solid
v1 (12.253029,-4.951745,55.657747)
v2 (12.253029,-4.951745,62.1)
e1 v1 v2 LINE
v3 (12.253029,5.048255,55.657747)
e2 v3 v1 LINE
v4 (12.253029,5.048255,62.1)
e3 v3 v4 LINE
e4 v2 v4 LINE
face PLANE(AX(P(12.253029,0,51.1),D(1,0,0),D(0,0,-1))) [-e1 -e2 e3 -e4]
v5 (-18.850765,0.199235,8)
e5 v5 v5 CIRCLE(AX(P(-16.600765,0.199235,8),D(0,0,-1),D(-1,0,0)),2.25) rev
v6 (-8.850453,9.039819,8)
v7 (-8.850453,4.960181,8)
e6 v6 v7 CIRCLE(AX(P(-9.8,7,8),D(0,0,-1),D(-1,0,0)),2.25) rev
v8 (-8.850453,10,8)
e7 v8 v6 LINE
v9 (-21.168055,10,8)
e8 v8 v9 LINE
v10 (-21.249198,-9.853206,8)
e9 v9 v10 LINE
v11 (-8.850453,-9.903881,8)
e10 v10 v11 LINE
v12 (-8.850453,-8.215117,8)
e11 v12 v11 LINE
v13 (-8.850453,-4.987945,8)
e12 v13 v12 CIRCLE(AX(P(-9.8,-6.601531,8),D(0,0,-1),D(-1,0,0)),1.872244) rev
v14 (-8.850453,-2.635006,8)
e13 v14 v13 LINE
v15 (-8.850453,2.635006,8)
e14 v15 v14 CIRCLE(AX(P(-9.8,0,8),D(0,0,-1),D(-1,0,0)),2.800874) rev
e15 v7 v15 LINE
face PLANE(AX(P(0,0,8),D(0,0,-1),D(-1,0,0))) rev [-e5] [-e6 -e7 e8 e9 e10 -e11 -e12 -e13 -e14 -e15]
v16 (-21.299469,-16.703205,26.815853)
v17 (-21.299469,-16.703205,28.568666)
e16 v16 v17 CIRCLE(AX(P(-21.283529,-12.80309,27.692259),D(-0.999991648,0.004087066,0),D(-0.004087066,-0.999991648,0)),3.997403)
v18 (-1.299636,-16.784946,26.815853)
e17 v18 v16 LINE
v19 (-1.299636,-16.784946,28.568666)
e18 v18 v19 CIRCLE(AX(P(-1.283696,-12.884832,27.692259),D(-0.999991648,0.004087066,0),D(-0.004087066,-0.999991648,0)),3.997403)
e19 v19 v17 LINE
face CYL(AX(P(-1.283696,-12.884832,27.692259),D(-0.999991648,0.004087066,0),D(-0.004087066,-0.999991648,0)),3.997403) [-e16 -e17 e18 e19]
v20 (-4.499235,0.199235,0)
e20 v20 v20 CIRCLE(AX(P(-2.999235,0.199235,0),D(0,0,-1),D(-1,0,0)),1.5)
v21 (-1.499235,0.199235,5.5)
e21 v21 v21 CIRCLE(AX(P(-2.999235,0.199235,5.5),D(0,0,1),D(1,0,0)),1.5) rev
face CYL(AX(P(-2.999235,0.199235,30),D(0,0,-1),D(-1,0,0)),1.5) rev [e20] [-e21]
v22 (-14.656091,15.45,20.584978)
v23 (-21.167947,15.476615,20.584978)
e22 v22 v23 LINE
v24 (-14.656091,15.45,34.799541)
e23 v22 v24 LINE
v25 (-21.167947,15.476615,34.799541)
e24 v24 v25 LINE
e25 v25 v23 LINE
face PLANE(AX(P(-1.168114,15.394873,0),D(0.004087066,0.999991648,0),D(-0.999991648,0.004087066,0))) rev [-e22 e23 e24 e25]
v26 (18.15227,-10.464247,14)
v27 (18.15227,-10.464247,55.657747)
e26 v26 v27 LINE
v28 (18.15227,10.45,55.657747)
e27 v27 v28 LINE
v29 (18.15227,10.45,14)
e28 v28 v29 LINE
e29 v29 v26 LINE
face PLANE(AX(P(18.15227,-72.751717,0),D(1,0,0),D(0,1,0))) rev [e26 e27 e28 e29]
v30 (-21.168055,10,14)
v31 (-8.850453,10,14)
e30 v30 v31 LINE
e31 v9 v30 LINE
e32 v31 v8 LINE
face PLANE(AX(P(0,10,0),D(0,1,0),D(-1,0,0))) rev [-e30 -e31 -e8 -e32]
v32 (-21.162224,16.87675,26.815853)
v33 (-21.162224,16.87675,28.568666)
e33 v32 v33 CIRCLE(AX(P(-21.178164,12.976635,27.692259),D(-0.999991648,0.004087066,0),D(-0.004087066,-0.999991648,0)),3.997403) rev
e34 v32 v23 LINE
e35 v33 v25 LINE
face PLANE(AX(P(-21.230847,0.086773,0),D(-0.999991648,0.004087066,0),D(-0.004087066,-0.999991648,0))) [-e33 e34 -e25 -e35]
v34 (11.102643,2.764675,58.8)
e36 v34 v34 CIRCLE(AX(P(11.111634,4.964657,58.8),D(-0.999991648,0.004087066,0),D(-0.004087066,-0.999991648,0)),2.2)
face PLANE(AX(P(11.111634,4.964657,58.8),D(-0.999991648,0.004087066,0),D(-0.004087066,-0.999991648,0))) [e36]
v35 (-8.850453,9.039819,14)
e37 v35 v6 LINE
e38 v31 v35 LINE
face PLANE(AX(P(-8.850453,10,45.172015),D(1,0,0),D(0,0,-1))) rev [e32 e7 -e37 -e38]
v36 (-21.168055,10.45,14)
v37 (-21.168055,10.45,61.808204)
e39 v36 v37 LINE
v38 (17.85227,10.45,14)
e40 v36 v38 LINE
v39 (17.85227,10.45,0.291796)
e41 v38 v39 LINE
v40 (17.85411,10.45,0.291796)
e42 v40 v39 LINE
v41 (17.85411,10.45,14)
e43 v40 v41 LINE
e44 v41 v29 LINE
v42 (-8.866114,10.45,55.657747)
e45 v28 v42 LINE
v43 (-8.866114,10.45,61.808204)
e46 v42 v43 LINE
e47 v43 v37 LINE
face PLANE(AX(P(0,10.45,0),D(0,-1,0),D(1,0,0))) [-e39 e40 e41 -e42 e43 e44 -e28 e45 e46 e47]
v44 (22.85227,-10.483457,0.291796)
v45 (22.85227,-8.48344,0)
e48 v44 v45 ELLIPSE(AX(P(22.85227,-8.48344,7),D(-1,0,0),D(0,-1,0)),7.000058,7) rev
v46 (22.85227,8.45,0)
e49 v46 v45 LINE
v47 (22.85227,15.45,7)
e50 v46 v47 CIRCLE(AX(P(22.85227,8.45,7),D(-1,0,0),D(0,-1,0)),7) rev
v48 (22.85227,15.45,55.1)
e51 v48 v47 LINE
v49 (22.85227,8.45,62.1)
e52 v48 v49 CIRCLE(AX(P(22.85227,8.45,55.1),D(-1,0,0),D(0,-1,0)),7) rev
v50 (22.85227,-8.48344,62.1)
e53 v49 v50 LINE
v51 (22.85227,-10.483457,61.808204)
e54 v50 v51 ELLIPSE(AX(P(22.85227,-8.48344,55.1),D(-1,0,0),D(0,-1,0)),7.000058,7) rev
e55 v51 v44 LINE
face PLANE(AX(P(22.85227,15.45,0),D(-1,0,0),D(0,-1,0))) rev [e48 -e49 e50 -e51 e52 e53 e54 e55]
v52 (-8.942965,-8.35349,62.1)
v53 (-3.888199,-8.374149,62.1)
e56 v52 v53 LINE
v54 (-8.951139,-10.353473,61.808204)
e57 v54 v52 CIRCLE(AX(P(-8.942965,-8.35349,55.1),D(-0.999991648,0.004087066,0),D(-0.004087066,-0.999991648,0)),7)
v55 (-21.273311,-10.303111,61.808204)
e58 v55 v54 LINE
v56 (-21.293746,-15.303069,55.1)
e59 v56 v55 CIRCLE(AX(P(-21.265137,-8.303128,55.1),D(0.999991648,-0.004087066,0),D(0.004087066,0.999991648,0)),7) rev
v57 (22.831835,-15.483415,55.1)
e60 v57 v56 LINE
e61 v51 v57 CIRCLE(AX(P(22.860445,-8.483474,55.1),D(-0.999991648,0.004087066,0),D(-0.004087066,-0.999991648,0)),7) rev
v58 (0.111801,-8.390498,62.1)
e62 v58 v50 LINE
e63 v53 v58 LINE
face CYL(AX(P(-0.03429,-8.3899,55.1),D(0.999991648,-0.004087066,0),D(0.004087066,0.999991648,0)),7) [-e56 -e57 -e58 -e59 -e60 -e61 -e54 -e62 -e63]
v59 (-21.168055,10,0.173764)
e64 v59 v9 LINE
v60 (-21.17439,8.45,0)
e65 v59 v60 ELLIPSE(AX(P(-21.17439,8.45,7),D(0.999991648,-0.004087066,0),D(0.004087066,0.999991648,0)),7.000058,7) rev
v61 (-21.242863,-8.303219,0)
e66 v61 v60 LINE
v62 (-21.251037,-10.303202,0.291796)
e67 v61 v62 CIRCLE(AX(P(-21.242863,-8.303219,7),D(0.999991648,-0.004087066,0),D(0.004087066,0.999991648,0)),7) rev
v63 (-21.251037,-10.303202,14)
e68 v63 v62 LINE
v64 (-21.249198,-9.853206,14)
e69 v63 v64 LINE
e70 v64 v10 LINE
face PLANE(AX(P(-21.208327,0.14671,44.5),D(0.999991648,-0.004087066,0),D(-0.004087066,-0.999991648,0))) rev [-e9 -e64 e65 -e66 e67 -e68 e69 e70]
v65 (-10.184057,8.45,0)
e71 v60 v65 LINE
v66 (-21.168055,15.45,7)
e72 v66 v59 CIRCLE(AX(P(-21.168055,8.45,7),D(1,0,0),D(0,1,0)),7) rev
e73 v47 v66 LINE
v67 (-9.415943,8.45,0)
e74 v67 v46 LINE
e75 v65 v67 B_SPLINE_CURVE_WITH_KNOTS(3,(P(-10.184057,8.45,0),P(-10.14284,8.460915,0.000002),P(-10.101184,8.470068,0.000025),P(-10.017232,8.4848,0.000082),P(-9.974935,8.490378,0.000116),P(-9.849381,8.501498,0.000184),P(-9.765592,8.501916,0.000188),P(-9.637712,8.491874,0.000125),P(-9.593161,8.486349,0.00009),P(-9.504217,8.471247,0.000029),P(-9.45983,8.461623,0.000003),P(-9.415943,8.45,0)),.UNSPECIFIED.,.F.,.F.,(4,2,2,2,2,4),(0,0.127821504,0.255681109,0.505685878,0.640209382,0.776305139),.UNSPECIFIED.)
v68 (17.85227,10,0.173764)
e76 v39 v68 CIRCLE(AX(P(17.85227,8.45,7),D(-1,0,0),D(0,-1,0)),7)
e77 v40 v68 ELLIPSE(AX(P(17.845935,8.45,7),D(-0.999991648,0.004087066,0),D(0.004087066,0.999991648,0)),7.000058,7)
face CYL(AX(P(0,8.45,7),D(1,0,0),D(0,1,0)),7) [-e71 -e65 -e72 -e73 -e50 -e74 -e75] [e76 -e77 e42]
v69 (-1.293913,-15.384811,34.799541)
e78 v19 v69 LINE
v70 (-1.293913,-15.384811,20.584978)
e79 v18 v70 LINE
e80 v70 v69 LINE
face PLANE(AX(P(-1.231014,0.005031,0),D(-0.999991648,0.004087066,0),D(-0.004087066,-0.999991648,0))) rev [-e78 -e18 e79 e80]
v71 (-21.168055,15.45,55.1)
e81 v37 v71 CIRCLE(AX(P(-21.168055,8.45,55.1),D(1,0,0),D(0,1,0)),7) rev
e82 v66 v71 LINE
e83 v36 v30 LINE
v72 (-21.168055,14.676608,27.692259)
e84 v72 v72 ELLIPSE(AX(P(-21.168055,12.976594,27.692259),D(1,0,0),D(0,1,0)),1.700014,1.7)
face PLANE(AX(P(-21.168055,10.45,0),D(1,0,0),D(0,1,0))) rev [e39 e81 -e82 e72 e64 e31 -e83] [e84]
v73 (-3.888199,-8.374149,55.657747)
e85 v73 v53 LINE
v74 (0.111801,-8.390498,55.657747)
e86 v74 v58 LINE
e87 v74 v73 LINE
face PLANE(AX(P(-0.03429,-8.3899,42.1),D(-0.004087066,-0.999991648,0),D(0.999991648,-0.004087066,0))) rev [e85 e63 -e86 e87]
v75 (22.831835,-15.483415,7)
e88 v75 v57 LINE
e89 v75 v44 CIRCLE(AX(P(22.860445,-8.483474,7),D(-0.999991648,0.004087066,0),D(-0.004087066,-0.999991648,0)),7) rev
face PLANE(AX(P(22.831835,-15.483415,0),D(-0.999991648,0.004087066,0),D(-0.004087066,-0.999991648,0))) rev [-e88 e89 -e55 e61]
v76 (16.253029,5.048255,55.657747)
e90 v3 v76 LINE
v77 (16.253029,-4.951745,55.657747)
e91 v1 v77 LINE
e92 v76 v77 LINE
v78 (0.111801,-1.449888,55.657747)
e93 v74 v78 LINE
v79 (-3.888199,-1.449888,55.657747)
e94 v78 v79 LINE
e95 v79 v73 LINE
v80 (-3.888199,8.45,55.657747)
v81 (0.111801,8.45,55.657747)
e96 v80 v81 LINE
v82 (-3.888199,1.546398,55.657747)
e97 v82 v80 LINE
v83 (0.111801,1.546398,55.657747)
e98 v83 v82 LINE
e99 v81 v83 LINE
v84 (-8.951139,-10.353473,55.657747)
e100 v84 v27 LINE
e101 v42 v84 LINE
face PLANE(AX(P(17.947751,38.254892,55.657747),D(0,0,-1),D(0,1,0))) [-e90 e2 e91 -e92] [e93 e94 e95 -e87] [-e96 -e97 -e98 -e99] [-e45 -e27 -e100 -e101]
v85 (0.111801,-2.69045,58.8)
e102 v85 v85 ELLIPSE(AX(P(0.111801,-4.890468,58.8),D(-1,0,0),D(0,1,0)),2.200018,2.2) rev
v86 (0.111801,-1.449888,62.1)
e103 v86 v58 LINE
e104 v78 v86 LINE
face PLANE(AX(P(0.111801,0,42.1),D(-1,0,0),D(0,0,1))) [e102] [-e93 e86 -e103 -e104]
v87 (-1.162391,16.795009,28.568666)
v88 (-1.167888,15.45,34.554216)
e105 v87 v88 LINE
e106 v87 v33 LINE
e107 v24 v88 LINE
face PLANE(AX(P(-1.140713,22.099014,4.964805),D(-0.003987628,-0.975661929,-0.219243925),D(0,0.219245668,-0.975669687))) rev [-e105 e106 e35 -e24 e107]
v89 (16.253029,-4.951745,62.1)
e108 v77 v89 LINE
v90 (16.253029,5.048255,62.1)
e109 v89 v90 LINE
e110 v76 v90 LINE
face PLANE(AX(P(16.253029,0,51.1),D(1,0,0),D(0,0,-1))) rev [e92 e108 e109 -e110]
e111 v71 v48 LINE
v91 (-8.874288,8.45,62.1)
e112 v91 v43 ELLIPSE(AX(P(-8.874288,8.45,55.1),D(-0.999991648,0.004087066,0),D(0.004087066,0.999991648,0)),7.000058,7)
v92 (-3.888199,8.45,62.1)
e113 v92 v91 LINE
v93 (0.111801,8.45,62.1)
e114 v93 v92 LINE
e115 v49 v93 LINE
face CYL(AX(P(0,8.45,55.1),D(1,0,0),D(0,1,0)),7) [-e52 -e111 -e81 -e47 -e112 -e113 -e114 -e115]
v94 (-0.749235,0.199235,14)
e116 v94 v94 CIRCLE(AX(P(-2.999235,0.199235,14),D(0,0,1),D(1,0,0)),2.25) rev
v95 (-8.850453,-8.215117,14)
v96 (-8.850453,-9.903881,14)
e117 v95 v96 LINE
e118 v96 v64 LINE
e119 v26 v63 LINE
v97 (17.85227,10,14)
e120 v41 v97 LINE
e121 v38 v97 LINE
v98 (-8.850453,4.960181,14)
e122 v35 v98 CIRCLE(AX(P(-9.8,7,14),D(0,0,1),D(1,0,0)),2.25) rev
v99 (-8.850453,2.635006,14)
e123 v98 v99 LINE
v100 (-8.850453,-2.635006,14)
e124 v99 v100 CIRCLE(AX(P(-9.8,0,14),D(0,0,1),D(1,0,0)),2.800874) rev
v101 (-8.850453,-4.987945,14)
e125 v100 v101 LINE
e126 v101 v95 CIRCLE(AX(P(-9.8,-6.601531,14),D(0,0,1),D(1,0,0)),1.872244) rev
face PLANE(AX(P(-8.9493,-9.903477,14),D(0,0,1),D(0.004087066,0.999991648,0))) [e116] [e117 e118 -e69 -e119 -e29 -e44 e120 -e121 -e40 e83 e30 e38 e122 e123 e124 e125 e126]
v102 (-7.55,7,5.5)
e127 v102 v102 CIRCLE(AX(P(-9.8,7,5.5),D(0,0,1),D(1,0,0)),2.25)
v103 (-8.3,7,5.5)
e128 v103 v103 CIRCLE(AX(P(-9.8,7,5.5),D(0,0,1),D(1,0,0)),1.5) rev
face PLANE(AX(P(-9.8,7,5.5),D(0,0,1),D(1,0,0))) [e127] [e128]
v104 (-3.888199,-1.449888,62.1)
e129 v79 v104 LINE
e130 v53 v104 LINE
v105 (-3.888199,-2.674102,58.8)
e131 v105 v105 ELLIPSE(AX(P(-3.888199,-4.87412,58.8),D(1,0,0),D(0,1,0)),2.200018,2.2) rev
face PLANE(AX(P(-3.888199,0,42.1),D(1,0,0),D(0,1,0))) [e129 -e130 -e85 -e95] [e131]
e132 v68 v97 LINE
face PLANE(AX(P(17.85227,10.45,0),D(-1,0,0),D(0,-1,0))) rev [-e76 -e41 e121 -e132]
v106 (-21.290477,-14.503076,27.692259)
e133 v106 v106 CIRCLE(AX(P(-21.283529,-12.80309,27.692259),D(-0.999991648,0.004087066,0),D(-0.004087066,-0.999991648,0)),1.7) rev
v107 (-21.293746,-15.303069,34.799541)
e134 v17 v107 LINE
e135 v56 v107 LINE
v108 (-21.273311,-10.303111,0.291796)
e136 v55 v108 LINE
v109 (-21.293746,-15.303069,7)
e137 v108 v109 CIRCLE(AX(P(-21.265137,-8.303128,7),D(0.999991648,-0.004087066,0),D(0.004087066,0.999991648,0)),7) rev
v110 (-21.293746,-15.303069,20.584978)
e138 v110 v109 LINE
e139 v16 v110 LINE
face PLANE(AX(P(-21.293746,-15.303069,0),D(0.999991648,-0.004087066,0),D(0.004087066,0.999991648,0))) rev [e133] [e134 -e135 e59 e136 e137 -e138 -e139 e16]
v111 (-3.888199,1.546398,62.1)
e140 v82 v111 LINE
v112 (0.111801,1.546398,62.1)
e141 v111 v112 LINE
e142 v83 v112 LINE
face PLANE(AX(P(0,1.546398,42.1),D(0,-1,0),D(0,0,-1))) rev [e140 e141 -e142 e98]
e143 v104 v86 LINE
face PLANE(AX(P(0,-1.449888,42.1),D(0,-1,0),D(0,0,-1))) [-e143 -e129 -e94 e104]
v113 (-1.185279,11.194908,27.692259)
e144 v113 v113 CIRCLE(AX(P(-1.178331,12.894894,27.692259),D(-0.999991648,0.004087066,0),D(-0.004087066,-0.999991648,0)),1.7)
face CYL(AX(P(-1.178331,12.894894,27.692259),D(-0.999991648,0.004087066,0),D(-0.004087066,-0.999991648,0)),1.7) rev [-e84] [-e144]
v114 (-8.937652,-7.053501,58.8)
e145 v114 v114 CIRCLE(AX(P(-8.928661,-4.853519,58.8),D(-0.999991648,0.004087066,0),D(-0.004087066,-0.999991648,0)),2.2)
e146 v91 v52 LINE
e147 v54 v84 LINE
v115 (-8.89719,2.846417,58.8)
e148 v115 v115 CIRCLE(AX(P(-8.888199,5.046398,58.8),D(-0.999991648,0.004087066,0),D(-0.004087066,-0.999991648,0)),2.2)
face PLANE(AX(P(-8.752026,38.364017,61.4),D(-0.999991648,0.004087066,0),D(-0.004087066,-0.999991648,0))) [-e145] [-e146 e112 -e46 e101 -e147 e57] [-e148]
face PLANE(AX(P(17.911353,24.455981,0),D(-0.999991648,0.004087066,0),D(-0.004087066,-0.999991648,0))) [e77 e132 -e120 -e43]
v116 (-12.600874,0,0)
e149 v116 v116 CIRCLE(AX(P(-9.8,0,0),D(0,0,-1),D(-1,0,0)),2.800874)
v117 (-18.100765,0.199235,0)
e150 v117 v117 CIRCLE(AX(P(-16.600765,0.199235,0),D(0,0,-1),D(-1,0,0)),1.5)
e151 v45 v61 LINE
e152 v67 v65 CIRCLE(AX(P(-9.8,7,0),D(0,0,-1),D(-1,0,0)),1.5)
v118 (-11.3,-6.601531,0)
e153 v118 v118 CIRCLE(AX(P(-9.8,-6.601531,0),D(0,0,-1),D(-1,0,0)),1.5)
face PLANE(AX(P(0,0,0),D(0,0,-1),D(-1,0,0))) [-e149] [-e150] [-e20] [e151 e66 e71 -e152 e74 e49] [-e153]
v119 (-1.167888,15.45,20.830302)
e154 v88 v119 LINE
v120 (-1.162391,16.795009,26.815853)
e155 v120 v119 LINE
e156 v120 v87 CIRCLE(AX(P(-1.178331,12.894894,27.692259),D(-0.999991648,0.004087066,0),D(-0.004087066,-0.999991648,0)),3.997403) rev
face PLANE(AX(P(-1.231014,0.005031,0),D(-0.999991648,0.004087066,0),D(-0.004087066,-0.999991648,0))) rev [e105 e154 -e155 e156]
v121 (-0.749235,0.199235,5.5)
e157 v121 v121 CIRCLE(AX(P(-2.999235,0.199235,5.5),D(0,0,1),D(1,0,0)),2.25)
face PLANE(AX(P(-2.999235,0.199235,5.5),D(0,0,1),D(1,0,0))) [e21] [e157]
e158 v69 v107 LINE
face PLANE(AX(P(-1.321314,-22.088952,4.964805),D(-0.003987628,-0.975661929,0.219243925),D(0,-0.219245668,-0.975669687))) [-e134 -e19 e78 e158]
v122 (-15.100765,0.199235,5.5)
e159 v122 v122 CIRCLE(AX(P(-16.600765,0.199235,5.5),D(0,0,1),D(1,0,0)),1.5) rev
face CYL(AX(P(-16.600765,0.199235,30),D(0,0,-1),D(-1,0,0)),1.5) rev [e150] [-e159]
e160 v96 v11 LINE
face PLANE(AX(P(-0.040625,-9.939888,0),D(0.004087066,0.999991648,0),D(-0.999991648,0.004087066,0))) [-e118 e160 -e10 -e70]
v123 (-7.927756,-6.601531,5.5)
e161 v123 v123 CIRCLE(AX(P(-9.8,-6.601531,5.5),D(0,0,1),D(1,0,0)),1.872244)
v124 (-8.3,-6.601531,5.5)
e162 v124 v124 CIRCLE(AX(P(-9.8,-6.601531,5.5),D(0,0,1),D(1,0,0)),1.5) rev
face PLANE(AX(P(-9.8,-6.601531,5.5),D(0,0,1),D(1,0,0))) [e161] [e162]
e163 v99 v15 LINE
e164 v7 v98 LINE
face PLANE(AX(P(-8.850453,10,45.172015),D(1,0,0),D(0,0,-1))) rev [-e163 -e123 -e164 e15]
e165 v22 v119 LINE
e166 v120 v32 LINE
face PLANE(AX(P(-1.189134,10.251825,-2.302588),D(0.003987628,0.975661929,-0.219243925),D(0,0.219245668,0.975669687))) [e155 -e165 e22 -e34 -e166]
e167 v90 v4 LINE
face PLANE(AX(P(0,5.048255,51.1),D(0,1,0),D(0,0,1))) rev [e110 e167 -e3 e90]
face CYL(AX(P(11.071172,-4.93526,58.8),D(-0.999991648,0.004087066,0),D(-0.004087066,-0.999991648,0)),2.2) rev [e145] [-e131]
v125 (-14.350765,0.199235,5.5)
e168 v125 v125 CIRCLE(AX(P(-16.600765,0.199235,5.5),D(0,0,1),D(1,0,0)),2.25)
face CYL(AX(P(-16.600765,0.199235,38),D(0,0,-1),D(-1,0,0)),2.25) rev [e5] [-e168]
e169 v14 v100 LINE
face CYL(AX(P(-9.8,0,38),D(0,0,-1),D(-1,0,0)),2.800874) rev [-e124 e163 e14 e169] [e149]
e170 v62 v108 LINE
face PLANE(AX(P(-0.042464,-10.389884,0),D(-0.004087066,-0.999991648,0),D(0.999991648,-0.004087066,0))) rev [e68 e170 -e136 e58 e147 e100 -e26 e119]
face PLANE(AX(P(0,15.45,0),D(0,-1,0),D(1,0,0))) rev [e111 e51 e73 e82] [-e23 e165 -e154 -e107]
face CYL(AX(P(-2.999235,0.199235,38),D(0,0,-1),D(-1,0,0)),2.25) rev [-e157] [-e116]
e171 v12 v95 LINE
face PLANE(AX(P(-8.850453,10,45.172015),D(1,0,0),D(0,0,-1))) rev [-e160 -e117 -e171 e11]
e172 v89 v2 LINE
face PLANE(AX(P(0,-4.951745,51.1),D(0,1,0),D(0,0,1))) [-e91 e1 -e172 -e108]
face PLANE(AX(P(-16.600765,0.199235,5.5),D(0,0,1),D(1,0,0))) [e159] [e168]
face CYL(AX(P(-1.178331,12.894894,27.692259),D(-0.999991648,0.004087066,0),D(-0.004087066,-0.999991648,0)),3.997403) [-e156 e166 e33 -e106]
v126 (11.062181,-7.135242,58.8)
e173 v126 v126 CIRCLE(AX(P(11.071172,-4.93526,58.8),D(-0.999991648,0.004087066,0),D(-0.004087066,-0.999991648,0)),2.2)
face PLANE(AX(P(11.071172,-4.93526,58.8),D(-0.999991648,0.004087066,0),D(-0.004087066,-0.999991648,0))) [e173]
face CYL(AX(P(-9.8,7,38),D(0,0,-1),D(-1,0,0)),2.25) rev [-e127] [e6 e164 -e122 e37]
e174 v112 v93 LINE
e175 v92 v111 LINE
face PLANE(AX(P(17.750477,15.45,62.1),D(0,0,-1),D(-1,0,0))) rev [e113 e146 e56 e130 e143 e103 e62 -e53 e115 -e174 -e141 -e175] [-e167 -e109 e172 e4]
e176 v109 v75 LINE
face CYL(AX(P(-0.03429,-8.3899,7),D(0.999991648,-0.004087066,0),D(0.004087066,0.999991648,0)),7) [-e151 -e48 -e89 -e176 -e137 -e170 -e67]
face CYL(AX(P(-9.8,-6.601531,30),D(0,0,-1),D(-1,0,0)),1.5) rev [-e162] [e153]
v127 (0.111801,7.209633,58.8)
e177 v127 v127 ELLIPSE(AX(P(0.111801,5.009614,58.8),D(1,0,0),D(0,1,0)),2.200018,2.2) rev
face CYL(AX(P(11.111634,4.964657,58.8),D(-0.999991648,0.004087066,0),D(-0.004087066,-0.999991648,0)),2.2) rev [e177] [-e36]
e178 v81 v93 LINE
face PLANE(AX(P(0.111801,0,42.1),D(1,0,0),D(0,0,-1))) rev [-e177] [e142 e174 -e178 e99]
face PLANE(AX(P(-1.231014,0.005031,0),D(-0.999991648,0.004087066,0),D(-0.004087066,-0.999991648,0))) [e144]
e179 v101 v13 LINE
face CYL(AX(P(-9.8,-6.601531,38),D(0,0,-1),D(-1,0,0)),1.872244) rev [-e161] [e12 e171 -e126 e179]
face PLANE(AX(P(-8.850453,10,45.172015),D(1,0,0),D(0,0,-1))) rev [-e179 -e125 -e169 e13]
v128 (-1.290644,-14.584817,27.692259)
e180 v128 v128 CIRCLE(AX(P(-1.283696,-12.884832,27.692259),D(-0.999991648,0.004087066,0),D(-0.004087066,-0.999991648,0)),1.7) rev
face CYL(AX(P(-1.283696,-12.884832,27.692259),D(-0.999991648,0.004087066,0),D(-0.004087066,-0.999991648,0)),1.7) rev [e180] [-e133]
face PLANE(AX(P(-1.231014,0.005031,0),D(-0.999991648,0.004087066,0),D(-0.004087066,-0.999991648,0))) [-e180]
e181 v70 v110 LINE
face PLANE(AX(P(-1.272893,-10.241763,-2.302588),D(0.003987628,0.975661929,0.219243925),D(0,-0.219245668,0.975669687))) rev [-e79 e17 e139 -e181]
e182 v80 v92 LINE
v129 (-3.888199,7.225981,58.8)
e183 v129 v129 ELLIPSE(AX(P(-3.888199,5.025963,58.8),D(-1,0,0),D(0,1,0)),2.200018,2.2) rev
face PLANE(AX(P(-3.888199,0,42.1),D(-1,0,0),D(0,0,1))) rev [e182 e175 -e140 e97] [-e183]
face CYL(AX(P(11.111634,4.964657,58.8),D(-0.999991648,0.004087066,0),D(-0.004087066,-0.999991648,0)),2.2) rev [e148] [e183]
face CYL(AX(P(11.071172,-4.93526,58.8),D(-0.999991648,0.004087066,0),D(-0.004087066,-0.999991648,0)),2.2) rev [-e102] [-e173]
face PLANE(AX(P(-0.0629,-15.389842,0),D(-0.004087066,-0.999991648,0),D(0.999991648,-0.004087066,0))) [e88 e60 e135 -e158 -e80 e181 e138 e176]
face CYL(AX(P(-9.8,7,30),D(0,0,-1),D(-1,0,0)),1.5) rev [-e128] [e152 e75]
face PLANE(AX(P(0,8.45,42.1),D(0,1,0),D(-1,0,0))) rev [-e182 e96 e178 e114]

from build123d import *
from build123d.topology import SkipClean

# Parameters (mm, degrees)
BOSS_EXTRUDE1_DEPTH     = 8
BOSS_EXTRUDE2_REACH     = 29.616
SKETCH3_W               = 8
SKETCH3_H               = 20
BOSS_EXTRUDE3_DEPTH     = 6
SKETCH5_R               = 1.5
CUT_EXTRUDE1_DEPTH      = 30
CUT_EXTRUDE2_DEPTH      = 30
CUT_EXTRUDE2_DEPTH_BACK = 2.5
SKETCH6_R               = 1.872244448
SKETCH6_R_2             = 2.25
SKETCH6_R_3             = 2.800873709
SKETCH7_R               = 2.800873709
CUT_EXTRUDE3_DEPTH      = 32.5
BOSS_EXTRUDE4_DEPTH     = 0.45
BOSS_EXTRUDE5_REACH     = 34.303
SKETCH9_W               = 3.185015847
SKETCH9_H               = 14
SKETCH10_W              = 39.020325901
SKETCH10_H              = 14
BOSS_EXTRUDE6_DEPTH     = 0.45
BOSS_EXTRUDE7_DEPTH     = 5
BOSS_EXTRUDE8_REACH     = 71.397
SKETCH12_W              = 4.7
SKETCH12_H              = 62.1
BOSS_EXTRUDE10_REACH    = 73.051
BOSS_EXTRUDE12_REACH    = 73.051
SKETCH15_W              = 0.383636216
SKETCH15_H              = 14
SKETCH16_W              = 44.125949978
SKETCH16_H              = 62.1
BOSS_EXTRUDE13_DEPTH    = 5
FILLET1_R               = 7
SKETCH17_R              = 2.2
CUT_EXTRUDE8_DEPTH      = 20
CUT_EXTRUDE9_DEPTH      = 20
BOSS_EXTRUDE14_DEPTH    = 20
SKETCH20_R              = 1.7
CUT_EXTRUDE10_DEPTH     = 20
SKETCH21_W              = 4
SKETCH21_H              = 10
CUT_EXTRUDE11_DEPTH     = 11


with BuildPart() as part:
    # Sketch1 → Boss-Extrude1 (new body)
    with BuildSketch(Plane.XY):
        Polygon((-9.8, -9.9), (14.667227969, -10), (14.667227969, 10), (-9.8, 10), align=None)
    extrude(amount=BOSS_EXTRUDE1_DEPTH)

    # Boss-Extrude2: up to this plane
    boss_extrude2_end = Plane(origin=(-21.20832686, 0.146710491, 44.5), z_dir=(0.9999916479126735, -0.0040870655604918985, 1.0611945867115664e-14))
    # Sketch3 → Boss-Extrude2 (add, up to the surface)
    with BuildSketch(Plane.ZY.offset(9.8), mode=Mode.PRIVATE) as boss_extrude2_sk1:
        with Locations((4, 0)):
            Rectangle(SKETCH3_W, SKETCH3_H)
    boss_extrude2_tool1 = split(extrude(boss_extrude2_sk1.sketch, amount=BOSS_EXTRUDE2_REACH, mode=Mode.PRIVATE), bisect_by=boss_extrude2_end, keep=Keep.BOTH, mode=Mode.PRIVATE)
    add(boss_extrude2_tool1.solids().sort_by_distance((-9.8, 0, 4))[0])

    # Sketch4 → Boss-Extrude3 (add)
    with BuildSketch(Plane.XY.offset(8)):
        Polygon((14.667227969, 10), (-8.850453012, 10), (-8.850453012, -9.903880893), (14.667227969, -10), align=None)
    extrude(amount=BOSS_EXTRUDE3_DEPTH)

    # Sketch5 → Cut-Extrude1 (cut)
    with BuildSketch(Plane(origin=(0, 0, 0), x_dir=(-1, 0, 0), z_dir=(0, 0, -1))):
        with Locations((9.8, 7)):
            Circle(SKETCH5_R)
        with Locations((16.600765498, 0.199234502)):
            Circle(SKETCH5_R)
        with Locations((2.999234502, 0.199234502)):
            Circle(SKETCH5_R)
        with Locations((9.8, -6.601530997)):
            Circle(SKETCH5_R)
    extrude(amount=-CUT_EXTRUDE1_DEPTH, mode=Mode.SUBTRACT)

    # Sketch6 → Cut-Extrude2 (cut, two sides: drawn at the far end of the back side and taken through both)
    with BuildSketch(Plane.XY.offset(8).offset(-CUT_EXTRUDE2_DEPTH_BACK)):
        with Locations(Location((-9.8, -6.601530997, 0), (0, 0, 300.475535412))):
            Circle(SKETCH6_R)
        with Locations((-2.999234502, 0.199234502)):
            Circle(SKETCH6_R_2)
        with Locations(Location((-16.600765498, 0.199234502, 0), (0, 0, 180))):
            Circle(SKETCH6_R_2)
        with Locations(Location((-9.8, 7, 0), (0, 0, 65.037759798))):
            Circle(SKETCH6_R_2)
        with Locations(Location((-9.8, 0, 0), (0, 0, 289.81706499))):
            Circle(SKETCH6_R_3)
    extrude(amount=CUT_EXTRUDE2_DEPTH + CUT_EXTRUDE2_DEPTH_BACK, mode=Mode.SUBTRACT)

    # Sketch7 → Cut-Extrude3 (cut)
    with SkipClean():  # the faces are left unmerged after this step: merging them gives an invalid solid
        with BuildSketch(Plane.XY.offset(8)):
            with Locations(Location((-9.8, 0, 0), (0, 0, 180))):
                Circle(SKETCH7_R)
        extrude(amount=-CUT_EXTRUDE3_DEPTH, mode=Mode.SUBTRACT)
    add(part.part.scale(1), mode=Mode.REPLACE)  # the faces are merged on a copy

    # Sketch8 → Boss-Extrude4 (add)
    with BuildSketch(Plane(origin=(-0.040625311, -9.939887537, 0), x_dir=(-0.9999916479126736, 0.004087065560474376, 0), z_dir=(-0.004087065560474377, -0.9999916479126737, 0))):
        Polygon((21.208749342, -8), (21.208749342, -14), (-17.811250658, -14), (-17.811250658, 0), (21.208749342, 0), align=None)
    extrude(amount=BOSS_EXTRUDE4_DEPTH)

    # Boss-Extrude5: up to this face of the body (flat: up to its plane)
    boss_extrude5_end = Plane(part.part.faces().sort_by_distance((-1.218931766, 10, 6.308951595))[0])
    # Sketch9 → Boss-Extrude5 (add, up to the picked face)
    with BuildSketch(Plane(origin=(-0.040625311, -9.939887537, 0), x_dir=(0.9999916479126736, -0.004087065560474399, 0), z_dir=(0.0040870655604743995, 0.9999916479126737, 0)), mode=Mode.PRIVATE) as boss_extrude5_sk1:
        with Locations((16.218742735, -7)):
            Rectangle(SKETCH9_W, SKETCH9_H)
    boss_extrude5_tool1 = split(extrude(boss_extrude5_sk1.sketch, amount=BOSS_EXTRUDE5_REACH, mode=Mode.PRIVATE), bisect_by=boss_extrude5_end, keep=Keep.BOTH, mode=Mode.PRIVATE)
    add(boss_extrude5_tool1.solids().sort_by(Axis((16.177982, -10.006175, 7), (0.0040870655604743995, 0.9999916479126737, 0)))[0])

    # Sketch10 → Boss-Extrude6 (add)
    with BuildSketch(Plane(origin=(0, 10, 0), x_dir=(1, 0, 0), z_dir=(0, 1, 0))):
        with Locations((-1.657892534, -7)):
            Rectangle(SKETCH10_W, SKETCH10_H)
    extrude(amount=BOSS_EXTRUDE6_DEPTH)

    # Sketch11 → Boss-Extrude7 (add)
    with BuildSketch(Plane(origin=(0, 10.45, 0), x_dir=(1, 0, 0), z_dir=(0, 1, 0))):
        Polygon((-21.168055484, 0), (17.852270417, 0), (22.852270417, 0), (22.852270417, -55.1), (22.852270417, -62.1), (17.750476753, -62.1), (-21.168055484, -62.1), align=None)
    extrude(amount=BOSS_EXTRUDE7_DEPTH)

    # Boss-Extrude8: up to this plane
    boss_extrude8_end = Plane(origin=(-0.042464491, -10.389883779, 0), z_dir=(0.004087065560474399, 0.9999916479126736, 0))
    # Sketch12 → Boss-Extrude8 (add, up to the surface)
    with BuildSketch(Plane(origin=(0, 10.45, 0), x_dir=(-1, 0, 0), z_dir=(0, -1, 0)), mode=Mode.PRIVATE) as boss_extrude8_sk1:
        with Locations((-20.502270417, -31.05)):
            Rectangle(SKETCH12_W, SKETCH12_H)
    boss_extrude8_tool1 = split(extrude(boss_extrude8_sk1.sketch, amount=BOSS_EXTRUDE8_REACH, mode=Mode.PRIVATE), bisect_by=boss_extrude8_end, keep=Keep.BOTH, mode=Mode.PRIVATE)
    add(boss_extrude8_tool1.solids().sort_by_distance((20.50227, 10.45, 31.05))[0])

    # Boss-Extrude10: up to this plane
    boss_extrude10_end = Plane(origin=(0, 10.45, 0), z_dir=(0, -1, 0))
    # Sketch13 → Boss-Extrude10 (add, up to the surface)
    with BuildSketch(Plane(origin=(-0.042464491, -10.389883779, 0), x_dir=(-0.9999916479126736, 0.004087065560474399, 0), z_dir=(-0.0040870655604743995, -0.9999916479126737, 0)), mode=Mode.PRIVATE) as boss_extrude10_sk1:
        Polygon((8.908749342, -61.4), (8.908749342, -62.1), (-17.791250658, -62.1), (-18.194886874, -62.1), (-18.194886874, -55.657746708), (-17.791250658, -55.657746708), (8.908749342, -55.657746708), align=None)
    boss_extrude10_tool1 = split(extrude(boss_extrude10_sk1.sketch, amount=-BOSS_EXTRUDE10_REACH, mode=Mode.PRIVATE), bisect_by=boss_extrude10_end, keep=Keep.BOTH, mode=Mode.PRIVATE)
    add(boss_extrude10_tool1.solids().sort_by_distance((4.600565, -10.40886, 58.878873))[0])

    # Boss-Extrude12: up to this plane
    boss_extrude12_end = Plane(origin=(0, 10.45, 0), z_dir=(0, -1, 0))
    # Sketch15 → Boss-Extrude12 (add, up to the surface)
    with BuildSketch(Plane(origin=(-0.042464491, -10.389883779, 0), x_dir=(0.9999916479126736, -0.004087065560474399, 0), z_dir=(-0.0040870655604743995, -0.9999916479126737, 0)), mode=Mode.PRIVATE) as boss_extrude12_sk1:
        with Locations((18.003068766, 7)):
            Rectangle(SKETCH15_W, SKETCH15_H)
    boss_extrude12_tool1 = split(extrude(boss_extrude12_sk1.sketch, amount=-BOSS_EXTRUDE12_REACH, mode=Mode.PRIVATE), bisect_by=boss_extrude12_end, keep=Keep.BOTH, mode=Mode.PRIVATE)
    add(boss_extrude12_tool1.solids().sort_by_distance((17.960454, -10.463464, 7))[0])

    # Sketch16 → Boss-Extrude13 (add)
    with BuildSketch(Plane(origin=(-0.042464491, -10.389883779, 0), x_dir=(-0.9999916479126736, 0.004087065560474399, 0), z_dir=(-0.0040870655604743995, -0.9999916479126737, 0))):
        with Locations((-0.83195114, -31.05)):
            Rectangle(SKETCH16_W, SKETCH16_H)
    extrude(amount=BOSS_EXTRUDE13_DEPTH)

    # Fillet1
    # the kernel refuses this fillet: 7 mm, written as the material it takes off along each edge
    with BuildSketch(Plane(origin=(40.352270417, 15.45, 62.1), x_dir=(0, 0, -1), z_dir=(-1, 0, 0))) as fillet1_piece_1:
        with BuildLine():
            CenterArc((FILLET1_R, FILLET1_R), FILLET1_R, 180, 90)
            Line((0, FILLET1_R), (0, 0))
            Line((0, 0), (FILLET1_R, 0))
        make_face()
    extrude(amount=79.020325901, mode=Mode.SUBTRACT)
    with BuildSketch(Plane(origin=(-38.793600183, -15.231545785, 62.1), x_dir=(0.004087065560474399, 0.9999916479126735, 0), z_dir=(0.9999916479126737, -0.0040870655604743995, 0)), Plane(origin=(40.331688928, -15.55493873, 0), x_dir=(0.004087065560474399, 0.9999916479126735, 0), z_dir=(-0.9999916479126737, 0.0040870655604743995, 0))) as fillet1_piece_2:
        with BuildLine():
            CenterArc((FILLET1_R, -FILLET1_R), FILLET1_R, 90, 90)
            Line((0, -FILLET1_R), (0, 0))
            Line((0, 0), (FILLET1_R, 0))
        make_face()
    extrude(amount=79.125949978, mode=Mode.SUBTRACT)
    with BuildSketch(Plane(origin=(-38.668055484, 15.45, 0), x_dir=(0, -1, 0), z_dir=(1, 0, 0))) as fillet1_piece_3:
        with BuildLine():
            CenterArc((FILLET1_R, -FILLET1_R), FILLET1_R, 90, 90)
            Line((0, -FILLET1_R), (0, 0))
            Line((0, 0), (FILLET1_R, 0))
        make_face()
    extrude(amount=79.020325901, mode=Mode.SUBTRACT)

    # Sketch17 → Cut-Extrude8 (cut)
    with BuildSketch(Plane(origin=(-8.908674935, 0.036410643, 0), x_dir=(0, 0, 1), z_dir=(-0.9999916479126737, 0.0040870655604744, -8.326704424266156e-13))):
        with Locations(Location((58.8, -4.889970557, 0), (0, 0, 270))):
            Circle(SKETCH17_R)
        with Locations(Location((58.8, 5.010029443, 0), (0, 0, 270))):
            Circle(SKETCH17_R)
    extrude(amount=-CUT_EXTRUDE8_DEPTH, mode=Mode.SUBTRACT)

    # Sketch18 → Cut-Extrude9 (cut)
    with BuildSketch(Plane.XY.offset(62.1)):
        Polygon((-3.888198616, -4.949888082), (-3.888198616, -8.374149176), (0.111801384, -8.390497575), (0.111801384, -1.449888082), (-3.888198616, -1.449888082), align=None)
        Polygon((-3.888198616, 8.45), (-3.888198616, 5.046398242), (-3.888198616, 1.546398242), (0.111801384, 1.546398242), (0.111801384, 8.45), align=None)
    extrude(amount=-CUT_EXTRUDE9_DEPTH, mode=Mode.SUBTRACT)

    # Sketch19 → Boss-Extrude14 (add)
    with BuildSketch(Plane(origin=(-21.230846526, 0.086772586, 0), x_dir=(0, 0, 1), z_dir=(-0.9999916479126737, 0.0040870655604743995, 0))):
        with BuildLine():
            Line((34.799540996, -15.389970557), (27.692259446, -15.389970557))
            Line((27.692259446, -15.389970557), (20.584977895, -15.389970557))
            Line((20.584977895, -15.389970557), (26.815853016, -16.790117538))
            ThreePointArc((26.815853016, -16.790117538), (27.692259446, -16.887374052), (28.568665876, -16.790117538))
            Line((28.568665876, -16.790117538), (34.799540996, -15.389970557))
        make_face()
        with BuildLine():
            ThreePointArc((26.815853016, 16.790117538), (27.692259446, 16.887374052), (28.568665876, 16.790117538))
            Line((28.568665876, 16.790117538), (34.799540996, 15.389970557))
            Line((34.799540996, 15.389970557), (20.584977895, 15.389970557))
            Line((20.584977895, 15.389970557), (26.815853016, 16.790117538))
        make_face()
    extrude(amount=-BOSS_EXTRUDE14_DEPTH)

    # Sketch20 → Cut-Extrude10 (cut)
    with BuildSketch(Plane(origin=(-21.230846526, 0.086772586, 0), x_dir=(0, 0, 1), z_dir=(-0.9999916479126737, 0.0040870655604743995, 0))):
        with Locations(Location((27.692259446, -12.889970557, 0), (0, 0, 270))):
            Circle(SKETCH20_R)
        with Locations(Location((27.692259446, 12.889970557, 0), (0, 0, 270))):
            Circle(SKETCH20_R)
    extrude(amount=-CUT_EXTRUDE10_DEPTH, mode=Mode.SUBTRACT)

    # Sketch21 → Cut-Extrude11 (cut)
    with BuildSketch(Plane.XY.offset(62.1)):
        with Locations((14.253029049, 0.04825508)):
            Rectangle(SKETCH21_W, SKETCH21_H)
    extrude(amount=-CUT_EXTRUDE11_DEPTH, mode=Mode.SUBTRACT)


solid = part.part
